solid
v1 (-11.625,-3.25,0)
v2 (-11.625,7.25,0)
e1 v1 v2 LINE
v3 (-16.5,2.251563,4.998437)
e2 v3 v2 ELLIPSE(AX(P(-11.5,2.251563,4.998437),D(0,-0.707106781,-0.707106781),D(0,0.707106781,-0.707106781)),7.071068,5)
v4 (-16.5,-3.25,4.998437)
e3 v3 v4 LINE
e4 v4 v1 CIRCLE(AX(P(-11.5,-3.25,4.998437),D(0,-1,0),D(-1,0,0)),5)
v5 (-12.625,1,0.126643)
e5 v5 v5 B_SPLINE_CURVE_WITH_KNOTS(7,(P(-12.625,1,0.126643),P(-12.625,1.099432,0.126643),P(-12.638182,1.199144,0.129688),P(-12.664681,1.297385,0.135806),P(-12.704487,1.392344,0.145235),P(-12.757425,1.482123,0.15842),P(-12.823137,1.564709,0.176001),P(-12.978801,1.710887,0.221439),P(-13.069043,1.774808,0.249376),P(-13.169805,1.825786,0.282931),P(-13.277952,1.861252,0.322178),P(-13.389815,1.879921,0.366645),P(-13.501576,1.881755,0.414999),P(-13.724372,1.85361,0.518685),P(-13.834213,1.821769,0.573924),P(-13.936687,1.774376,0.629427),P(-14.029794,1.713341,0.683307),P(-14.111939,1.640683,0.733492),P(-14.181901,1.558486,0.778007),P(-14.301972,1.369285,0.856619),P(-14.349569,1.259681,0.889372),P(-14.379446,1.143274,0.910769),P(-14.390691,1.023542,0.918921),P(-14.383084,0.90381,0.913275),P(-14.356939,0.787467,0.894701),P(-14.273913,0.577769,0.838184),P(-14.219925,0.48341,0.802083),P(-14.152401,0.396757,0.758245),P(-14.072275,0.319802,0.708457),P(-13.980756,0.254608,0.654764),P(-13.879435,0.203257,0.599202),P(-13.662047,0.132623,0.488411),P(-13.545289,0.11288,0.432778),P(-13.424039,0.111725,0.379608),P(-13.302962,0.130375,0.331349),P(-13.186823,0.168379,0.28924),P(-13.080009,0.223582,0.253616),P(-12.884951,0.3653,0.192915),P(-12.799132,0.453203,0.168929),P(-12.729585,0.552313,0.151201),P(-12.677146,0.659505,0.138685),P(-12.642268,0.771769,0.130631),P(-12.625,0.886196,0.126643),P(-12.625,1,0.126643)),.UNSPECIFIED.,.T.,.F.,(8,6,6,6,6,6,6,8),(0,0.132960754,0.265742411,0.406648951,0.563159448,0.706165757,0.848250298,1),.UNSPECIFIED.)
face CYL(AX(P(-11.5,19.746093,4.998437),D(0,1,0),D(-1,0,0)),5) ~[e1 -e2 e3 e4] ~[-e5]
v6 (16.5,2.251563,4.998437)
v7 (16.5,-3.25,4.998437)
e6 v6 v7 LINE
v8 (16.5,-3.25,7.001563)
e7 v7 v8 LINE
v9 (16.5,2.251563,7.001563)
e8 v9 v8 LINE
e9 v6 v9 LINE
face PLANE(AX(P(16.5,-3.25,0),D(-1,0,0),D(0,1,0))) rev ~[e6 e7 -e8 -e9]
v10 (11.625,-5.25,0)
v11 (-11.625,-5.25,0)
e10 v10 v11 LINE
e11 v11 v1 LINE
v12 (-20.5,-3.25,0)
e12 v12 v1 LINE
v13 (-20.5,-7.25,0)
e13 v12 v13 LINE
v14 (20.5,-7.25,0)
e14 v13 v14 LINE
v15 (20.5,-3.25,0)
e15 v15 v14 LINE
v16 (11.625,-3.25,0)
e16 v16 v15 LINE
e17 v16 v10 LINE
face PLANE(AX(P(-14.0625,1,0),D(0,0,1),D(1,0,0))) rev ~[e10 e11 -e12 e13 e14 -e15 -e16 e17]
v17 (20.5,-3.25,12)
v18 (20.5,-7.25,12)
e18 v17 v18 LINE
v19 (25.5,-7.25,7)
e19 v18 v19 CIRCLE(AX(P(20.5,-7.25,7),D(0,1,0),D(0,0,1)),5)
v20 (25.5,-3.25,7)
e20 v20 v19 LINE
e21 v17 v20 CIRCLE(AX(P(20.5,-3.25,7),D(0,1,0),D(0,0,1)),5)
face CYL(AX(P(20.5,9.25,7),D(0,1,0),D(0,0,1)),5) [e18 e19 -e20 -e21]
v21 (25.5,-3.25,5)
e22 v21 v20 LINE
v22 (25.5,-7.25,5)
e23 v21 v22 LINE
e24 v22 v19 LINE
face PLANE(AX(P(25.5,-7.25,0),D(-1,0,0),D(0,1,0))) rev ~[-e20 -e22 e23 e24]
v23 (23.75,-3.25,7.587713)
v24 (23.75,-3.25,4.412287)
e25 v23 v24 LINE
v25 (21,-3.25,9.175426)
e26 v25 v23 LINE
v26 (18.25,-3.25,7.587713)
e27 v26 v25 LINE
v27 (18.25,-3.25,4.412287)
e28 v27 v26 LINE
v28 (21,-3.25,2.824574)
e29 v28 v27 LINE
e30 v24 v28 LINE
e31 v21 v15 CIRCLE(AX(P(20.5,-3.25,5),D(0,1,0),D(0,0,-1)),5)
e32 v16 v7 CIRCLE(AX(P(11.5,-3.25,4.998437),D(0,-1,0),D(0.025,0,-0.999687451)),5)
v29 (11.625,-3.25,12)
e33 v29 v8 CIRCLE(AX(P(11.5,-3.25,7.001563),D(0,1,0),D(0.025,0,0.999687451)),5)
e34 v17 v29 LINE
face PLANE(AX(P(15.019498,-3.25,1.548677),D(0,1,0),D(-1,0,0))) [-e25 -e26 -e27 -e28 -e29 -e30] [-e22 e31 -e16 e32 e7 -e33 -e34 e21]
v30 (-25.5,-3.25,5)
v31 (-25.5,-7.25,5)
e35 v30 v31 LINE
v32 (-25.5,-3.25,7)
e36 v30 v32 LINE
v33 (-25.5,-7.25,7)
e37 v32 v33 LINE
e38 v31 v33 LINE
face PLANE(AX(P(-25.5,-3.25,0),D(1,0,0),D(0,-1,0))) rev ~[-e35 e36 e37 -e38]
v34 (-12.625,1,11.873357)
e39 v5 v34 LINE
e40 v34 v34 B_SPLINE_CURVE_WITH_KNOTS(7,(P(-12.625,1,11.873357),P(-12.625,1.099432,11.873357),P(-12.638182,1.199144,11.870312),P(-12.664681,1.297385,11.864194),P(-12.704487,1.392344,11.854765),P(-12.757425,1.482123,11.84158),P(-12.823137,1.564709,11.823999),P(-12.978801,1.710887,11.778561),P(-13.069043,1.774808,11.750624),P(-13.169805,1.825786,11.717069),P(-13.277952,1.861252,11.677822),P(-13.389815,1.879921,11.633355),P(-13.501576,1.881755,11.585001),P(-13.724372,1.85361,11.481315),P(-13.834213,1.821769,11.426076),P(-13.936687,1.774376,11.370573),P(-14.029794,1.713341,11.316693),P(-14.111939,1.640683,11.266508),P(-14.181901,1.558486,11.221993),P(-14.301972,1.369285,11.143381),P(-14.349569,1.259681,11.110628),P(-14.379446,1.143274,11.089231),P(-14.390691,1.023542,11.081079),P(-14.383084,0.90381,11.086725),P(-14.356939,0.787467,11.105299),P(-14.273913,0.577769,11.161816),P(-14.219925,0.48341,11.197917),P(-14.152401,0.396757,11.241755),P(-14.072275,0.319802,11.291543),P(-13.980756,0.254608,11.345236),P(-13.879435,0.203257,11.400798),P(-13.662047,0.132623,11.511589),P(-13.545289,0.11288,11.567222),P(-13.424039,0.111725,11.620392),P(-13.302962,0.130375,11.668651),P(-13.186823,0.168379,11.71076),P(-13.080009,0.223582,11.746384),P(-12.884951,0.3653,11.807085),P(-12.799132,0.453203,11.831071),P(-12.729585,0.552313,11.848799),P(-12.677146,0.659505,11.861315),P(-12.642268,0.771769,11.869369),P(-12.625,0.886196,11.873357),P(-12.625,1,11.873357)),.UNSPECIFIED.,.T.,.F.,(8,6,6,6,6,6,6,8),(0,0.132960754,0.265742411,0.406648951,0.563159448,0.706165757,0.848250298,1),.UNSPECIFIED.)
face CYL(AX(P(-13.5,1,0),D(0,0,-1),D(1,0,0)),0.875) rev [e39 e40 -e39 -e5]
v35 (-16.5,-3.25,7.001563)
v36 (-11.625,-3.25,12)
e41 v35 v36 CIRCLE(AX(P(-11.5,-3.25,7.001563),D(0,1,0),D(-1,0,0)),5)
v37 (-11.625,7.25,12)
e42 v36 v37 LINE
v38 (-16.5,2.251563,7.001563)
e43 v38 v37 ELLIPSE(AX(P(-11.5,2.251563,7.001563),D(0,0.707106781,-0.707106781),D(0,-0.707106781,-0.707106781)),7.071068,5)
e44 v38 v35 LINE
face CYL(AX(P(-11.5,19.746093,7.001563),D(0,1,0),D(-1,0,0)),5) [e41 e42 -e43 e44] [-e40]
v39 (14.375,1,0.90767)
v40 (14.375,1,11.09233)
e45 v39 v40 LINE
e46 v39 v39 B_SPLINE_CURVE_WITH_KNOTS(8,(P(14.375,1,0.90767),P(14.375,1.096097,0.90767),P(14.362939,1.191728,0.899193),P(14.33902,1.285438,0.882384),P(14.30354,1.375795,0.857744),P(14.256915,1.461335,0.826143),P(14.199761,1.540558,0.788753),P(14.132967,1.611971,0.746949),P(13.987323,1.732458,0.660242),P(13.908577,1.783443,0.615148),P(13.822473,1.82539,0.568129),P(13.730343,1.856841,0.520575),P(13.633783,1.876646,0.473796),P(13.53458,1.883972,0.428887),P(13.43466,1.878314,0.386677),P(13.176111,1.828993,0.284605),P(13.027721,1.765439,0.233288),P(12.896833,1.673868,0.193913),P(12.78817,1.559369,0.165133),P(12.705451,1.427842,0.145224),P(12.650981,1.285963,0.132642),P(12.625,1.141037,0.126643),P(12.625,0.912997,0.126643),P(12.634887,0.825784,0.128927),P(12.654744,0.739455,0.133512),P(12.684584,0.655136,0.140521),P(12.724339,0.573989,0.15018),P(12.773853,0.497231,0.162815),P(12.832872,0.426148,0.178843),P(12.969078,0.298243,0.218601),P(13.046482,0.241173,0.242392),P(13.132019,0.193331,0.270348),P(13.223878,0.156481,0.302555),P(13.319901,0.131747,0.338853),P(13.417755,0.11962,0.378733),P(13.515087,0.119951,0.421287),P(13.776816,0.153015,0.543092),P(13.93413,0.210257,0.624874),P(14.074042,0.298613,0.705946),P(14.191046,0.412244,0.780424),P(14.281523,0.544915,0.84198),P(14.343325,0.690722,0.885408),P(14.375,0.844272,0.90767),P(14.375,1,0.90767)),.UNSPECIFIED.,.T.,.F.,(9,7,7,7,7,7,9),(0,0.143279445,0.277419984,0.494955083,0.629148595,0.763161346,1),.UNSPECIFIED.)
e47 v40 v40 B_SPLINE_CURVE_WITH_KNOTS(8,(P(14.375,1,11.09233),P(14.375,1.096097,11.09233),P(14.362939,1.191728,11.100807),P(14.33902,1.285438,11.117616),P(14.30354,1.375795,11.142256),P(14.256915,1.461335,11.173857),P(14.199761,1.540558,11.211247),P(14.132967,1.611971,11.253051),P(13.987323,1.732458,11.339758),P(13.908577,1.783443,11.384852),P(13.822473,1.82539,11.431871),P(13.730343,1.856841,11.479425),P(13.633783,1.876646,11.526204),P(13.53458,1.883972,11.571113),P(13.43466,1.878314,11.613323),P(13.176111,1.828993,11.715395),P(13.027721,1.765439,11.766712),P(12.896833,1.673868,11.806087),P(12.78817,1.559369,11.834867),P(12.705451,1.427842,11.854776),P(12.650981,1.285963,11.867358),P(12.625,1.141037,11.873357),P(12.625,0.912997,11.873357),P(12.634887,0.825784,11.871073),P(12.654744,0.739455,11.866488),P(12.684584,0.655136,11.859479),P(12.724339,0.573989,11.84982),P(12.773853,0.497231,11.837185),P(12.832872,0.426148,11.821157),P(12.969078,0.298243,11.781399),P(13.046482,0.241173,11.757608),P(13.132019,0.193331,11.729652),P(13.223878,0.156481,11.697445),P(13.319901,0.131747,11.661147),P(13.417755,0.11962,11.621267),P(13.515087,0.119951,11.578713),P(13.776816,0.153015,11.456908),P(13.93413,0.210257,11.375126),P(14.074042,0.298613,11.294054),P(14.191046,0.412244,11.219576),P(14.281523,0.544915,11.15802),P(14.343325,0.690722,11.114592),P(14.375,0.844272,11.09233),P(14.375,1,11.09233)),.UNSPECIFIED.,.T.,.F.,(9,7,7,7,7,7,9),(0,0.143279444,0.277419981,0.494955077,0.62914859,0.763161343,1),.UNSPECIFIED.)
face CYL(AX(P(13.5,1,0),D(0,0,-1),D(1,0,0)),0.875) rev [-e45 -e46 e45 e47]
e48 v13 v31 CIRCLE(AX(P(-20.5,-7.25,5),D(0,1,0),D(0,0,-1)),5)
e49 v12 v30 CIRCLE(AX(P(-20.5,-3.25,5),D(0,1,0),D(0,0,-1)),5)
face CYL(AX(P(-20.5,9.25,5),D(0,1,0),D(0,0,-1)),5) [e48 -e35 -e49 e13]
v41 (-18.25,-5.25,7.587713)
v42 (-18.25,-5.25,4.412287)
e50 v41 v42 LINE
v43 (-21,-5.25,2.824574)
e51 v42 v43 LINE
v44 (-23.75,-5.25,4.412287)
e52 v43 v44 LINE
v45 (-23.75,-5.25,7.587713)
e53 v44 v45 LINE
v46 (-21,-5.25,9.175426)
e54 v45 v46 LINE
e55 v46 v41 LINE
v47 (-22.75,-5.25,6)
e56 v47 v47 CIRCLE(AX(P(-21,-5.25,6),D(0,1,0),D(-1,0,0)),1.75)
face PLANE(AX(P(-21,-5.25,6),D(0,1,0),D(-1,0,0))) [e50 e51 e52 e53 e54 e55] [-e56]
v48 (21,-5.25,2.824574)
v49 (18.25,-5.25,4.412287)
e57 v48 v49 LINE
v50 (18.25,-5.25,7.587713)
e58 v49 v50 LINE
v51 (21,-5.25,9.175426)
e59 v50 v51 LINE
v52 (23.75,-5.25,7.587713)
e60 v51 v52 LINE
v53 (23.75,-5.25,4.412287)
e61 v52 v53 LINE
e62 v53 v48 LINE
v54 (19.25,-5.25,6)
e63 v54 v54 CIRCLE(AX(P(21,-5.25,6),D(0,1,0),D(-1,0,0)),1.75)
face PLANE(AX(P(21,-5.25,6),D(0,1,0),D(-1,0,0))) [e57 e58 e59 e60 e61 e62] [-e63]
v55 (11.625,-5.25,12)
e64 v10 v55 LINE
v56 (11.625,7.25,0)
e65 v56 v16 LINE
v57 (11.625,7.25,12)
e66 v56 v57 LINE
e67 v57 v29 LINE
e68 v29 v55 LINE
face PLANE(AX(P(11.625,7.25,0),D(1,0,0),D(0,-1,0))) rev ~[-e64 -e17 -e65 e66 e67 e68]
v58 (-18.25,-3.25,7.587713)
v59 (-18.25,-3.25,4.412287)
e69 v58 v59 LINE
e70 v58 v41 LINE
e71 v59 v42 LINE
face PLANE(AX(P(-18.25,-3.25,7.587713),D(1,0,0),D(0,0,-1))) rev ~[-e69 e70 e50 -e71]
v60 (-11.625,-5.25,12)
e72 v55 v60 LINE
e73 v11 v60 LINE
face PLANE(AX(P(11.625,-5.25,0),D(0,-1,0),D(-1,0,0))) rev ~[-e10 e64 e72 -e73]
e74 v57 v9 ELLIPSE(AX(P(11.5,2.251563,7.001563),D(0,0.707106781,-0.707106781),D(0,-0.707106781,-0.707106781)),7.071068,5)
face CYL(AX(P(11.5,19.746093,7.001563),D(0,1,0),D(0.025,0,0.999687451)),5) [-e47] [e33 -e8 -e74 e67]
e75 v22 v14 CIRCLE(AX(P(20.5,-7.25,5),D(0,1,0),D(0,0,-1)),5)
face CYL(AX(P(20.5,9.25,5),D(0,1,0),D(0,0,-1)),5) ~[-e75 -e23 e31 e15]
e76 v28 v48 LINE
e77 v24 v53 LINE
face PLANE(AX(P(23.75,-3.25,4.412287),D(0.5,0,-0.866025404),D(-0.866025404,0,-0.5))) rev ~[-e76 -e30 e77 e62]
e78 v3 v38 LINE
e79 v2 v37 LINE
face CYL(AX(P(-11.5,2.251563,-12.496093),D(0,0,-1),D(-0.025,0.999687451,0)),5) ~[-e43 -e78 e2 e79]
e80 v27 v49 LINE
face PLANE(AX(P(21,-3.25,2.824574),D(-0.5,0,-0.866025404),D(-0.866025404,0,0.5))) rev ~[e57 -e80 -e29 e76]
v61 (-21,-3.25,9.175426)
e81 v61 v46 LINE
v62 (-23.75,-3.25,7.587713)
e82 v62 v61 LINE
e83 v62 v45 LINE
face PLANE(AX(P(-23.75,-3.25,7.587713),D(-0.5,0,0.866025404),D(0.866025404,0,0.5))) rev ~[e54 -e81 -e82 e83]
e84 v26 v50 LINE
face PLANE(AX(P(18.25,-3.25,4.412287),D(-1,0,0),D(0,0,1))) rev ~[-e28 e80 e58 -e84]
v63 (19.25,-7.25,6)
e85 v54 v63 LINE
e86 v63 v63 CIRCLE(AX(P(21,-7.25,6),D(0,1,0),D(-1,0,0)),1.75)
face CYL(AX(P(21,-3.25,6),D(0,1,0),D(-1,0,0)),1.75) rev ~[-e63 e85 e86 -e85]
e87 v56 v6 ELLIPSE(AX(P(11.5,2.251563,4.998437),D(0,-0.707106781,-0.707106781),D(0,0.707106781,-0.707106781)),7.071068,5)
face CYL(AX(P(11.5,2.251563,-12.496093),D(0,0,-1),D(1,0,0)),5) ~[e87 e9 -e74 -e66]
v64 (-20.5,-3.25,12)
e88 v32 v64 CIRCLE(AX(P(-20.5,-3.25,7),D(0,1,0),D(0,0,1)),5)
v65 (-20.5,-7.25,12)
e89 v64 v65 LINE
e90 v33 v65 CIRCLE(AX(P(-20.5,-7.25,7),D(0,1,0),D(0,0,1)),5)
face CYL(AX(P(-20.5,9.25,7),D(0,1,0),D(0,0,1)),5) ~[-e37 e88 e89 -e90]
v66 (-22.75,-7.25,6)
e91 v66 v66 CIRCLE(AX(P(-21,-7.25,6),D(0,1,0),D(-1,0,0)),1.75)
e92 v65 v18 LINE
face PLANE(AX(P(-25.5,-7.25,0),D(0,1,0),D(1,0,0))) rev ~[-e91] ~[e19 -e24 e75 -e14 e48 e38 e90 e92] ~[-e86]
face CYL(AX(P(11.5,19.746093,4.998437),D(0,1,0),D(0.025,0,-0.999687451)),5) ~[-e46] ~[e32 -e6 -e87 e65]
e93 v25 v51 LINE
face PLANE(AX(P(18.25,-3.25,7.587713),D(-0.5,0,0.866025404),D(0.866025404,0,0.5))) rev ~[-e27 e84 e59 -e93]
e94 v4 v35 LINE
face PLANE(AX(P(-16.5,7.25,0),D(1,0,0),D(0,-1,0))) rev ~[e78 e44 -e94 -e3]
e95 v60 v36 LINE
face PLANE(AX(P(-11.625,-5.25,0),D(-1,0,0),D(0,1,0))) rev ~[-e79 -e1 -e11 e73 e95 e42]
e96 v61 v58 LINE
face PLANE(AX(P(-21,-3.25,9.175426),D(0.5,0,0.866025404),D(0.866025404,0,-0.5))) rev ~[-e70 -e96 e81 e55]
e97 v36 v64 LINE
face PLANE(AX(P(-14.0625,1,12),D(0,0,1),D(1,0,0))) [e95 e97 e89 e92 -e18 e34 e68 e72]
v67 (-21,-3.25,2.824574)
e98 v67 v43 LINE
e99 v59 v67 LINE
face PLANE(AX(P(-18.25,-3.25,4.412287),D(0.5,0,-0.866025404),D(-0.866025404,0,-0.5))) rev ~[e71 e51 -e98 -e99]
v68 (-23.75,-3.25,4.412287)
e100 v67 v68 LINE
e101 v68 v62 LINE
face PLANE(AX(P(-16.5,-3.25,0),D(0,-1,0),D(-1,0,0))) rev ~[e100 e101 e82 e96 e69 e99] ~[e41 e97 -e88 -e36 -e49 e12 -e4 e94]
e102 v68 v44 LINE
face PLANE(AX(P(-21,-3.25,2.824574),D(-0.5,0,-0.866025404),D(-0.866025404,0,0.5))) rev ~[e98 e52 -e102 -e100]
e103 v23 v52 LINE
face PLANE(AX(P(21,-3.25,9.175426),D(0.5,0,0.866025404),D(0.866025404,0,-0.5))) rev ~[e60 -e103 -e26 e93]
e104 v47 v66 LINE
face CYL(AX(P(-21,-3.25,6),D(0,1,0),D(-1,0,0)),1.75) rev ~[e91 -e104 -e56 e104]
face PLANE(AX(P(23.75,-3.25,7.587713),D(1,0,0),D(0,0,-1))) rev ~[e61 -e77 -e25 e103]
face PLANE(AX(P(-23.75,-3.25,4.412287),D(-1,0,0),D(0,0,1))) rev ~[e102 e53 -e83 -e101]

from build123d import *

# Parameters (mm, degrees)
F0_R        = 0.875
F1_DEPTH    = 12
F2_R        = 1.75
F3_DEPTH    = 25
F4_DEPTH    = 2
F5_T1_DEPTH = 36.9921862789
F5_T3_DEPTH = 29
F5_T5_DEPTH = 22.9960931395


# Not quite as in the source:
# - a fillet or chamfer that OpenCascade refuses, or shapes differently, is made with other operations: its cross-section is extruded or revolved along the edge and cut away or added


with BuildPart() as f1:
    # F0 (on Top) → F1 (new body)
    with BuildSketch(Plane.XY):
        Polygon((-11.625, 7.25), (-16.5, 7.25), (-16.5, -3.25), (-16.5, -5.25), (-11.625, -5.25), align=None)
        with Locations((-13.5, 1)):
            Circle(F0_R, mode=Mode.SUBTRACT)
        Polygon((-16.5, -5.25), (-16.5, -3.25), (-25.5, -3.25), (-25.5, -7.25), (-16.5, -7.25), align=None)
        Polygon((11.625, -5.25), (-11.625, -5.25), (-16.5, -5.25), (-16.5, -7.25), (16.5, -7.25), (16.5, -5.25), align=None)
        Polygon((25.5, -3.25), (16.5, -3.25), (16.5, -5.25), (16.5, -7.25), (25.5, -7.25), align=None)
        Polygon((16.5, 7.25), (11.625, 7.25), (11.625, -5.25), (16.5, -5.25), (16.5, -3.25), align=None)
        with Locations((13.5, 1)):
            Circle(F0_R, mode=Mode.SUBTRACT)
    extrude(amount=F1_DEPTH)

    # F2 (on face) → F3 (cut)
    with BuildSketch(Plane(origin=(0, -3.25, 0), x_dir=(-1, 0, 0), z_dir=(0, 1, 0))):
        with Locations((-21, 6)):
            Circle(F2_R)
        with Locations((21, 6)):
            Circle(F2_R)
    extrude(amount=-F3_DEPTH, mode=Mode.SUBTRACT)

    # F2 (on face) → F4 (cut)
    with BuildSketch(Plane(origin=(0, -3.25, 0), x_dir=(-1, 0, 0), z_dir=(0, 1, 0))):
        Polygon((-23.75, 7.5877132403), (-23.75, 4.4122867597), (-21, 2.8245735195), (-18.25, 4.4122867597), (-18.25, 7.5877132403), (-21, 9.1754264805), align=None)
        with Locations((-21, 6)):
            Circle(F2_R, mode=Mode.SUBTRACT)
        Polygon((23.75, 4.4122867597), (23.75, 7.5877132403), (21, 9.1754264805), (18.25, 7.5877132403), (18.25, 4.4122867597), (21, 2.8245735195), align=None)
        with Locations((21, 6)):
            Circle(F2_R, mode=Mode.SUBTRACT)
    extrude(amount=-F4_DEPTH, mode=Mode.SUBTRACT)

    # F5: fillet of radius 5 on 10 edges, made by hand

    # F5_s2 → F5_t1 (cut)
    with BuildSketch(Plane.XY.offset(-12.4960931395)):
        with BuildLine():
            ThreePointArc((-11.625, 7.25), (-15.0794552658, 5.7426227552), (-16.5, 2.2515627442))
            Line((-16.5, 2.2515627442), (-16.5, 7.25))
            Line((-16.5, 7.25), (-11.625, 7.25))
        make_face()
        with BuildLine():
            ThreePointArc((16.5, 2.2515627442), (15.0794552658, 5.7426227552), (11.625, 7.25))
            Line((11.625, 7.25), (16.5, 7.25))
            Line((16.5, 7.25), (16.5, 2.2515627442))
        make_face()
    extrude(amount=F5_T1_DEPTH, mode=Mode.SUBTRACT)

    # F5_s4 → F5_t3 (cut)
    with BuildSketch(Plane.XZ.offset(-9.25)):
        with BuildLine():
            ThreePointArc((20.5, 12), (24.0355339059, 10.5355339059), (25.5, 7))
            Line((25.5, 7), (25.5, 12))
            Line((25.5, 12), (20.5, 12))
        make_face()
        with BuildLine():
            ThreePointArc((20.5, 0), (24.0355339059, 1.4644660941), (25.5, 5))
            Line((25.5, 5), (25.5, 0))
            Line((25.5, 0), (20.5, 0))
        make_face()
        with BuildLine():
            ThreePointArc((-20.5, 0), (-24.0355339059, 1.4644660941), (-25.5, 5))
            Line((-25.5, 5), (-25.5, 0))
            Line((-25.5, 0), (-20.5, 0))
        make_face()
        with BuildLine():
            ThreePointArc((-20.5, 12), (-24.0355339059, 10.5355339059), (-25.5, 7))
            Line((-25.5, 7), (-25.5, 12))
            Line((-25.5, 12), (-20.5, 12))
        make_face()
    extrude(amount=F5_T3_DEPTH, mode=Mode.SUBTRACT)

    # F5_s6 → F5_t5 (cut)
    with BuildSketch(Plane.XZ.offset(-19.7460931395)):
        with BuildLine():
            ThreePointArc((11.625, 0), (15.0794552658, 1.5073772448), (16.5, 4.9984372558))
            Line((16.5, 4.9984372558), (16.5, 0))
            Line((16.5, 0), (11.625, 0))
        make_face()
        with BuildLine():
            ThreePointArc((11.625, 12), (15.0794552658, 10.4926227552), (16.5, 7.0015627442))
            Line((16.5, 7.0015627442), (16.5, 12))
            Line((16.5, 12), (11.625, 12))
        make_face()
        with BuildLine():
            ThreePointArc((-16.5, 7.0015627442), (-15.0794552658, 10.4926227552), (-11.625, 12))
            Line((-11.625, 12), (-16.5, 12))
            Line((-16.5, 12), (-16.5, 7.0015627442))
        make_face()
        with BuildLine():
            ThreePointArc((-16.5, 4.9984372558), (-15.0794552658, 1.5073772448), (-11.625, 0))
            Line((-11.625, 0), (-16.5, 0))
            Line((-16.5, 0), (-16.5, 4.9984372558))
        make_face()
    extrude(amount=F5_T5_DEPTH, mode=Mode.SUBTRACT)


solid = f1.part
